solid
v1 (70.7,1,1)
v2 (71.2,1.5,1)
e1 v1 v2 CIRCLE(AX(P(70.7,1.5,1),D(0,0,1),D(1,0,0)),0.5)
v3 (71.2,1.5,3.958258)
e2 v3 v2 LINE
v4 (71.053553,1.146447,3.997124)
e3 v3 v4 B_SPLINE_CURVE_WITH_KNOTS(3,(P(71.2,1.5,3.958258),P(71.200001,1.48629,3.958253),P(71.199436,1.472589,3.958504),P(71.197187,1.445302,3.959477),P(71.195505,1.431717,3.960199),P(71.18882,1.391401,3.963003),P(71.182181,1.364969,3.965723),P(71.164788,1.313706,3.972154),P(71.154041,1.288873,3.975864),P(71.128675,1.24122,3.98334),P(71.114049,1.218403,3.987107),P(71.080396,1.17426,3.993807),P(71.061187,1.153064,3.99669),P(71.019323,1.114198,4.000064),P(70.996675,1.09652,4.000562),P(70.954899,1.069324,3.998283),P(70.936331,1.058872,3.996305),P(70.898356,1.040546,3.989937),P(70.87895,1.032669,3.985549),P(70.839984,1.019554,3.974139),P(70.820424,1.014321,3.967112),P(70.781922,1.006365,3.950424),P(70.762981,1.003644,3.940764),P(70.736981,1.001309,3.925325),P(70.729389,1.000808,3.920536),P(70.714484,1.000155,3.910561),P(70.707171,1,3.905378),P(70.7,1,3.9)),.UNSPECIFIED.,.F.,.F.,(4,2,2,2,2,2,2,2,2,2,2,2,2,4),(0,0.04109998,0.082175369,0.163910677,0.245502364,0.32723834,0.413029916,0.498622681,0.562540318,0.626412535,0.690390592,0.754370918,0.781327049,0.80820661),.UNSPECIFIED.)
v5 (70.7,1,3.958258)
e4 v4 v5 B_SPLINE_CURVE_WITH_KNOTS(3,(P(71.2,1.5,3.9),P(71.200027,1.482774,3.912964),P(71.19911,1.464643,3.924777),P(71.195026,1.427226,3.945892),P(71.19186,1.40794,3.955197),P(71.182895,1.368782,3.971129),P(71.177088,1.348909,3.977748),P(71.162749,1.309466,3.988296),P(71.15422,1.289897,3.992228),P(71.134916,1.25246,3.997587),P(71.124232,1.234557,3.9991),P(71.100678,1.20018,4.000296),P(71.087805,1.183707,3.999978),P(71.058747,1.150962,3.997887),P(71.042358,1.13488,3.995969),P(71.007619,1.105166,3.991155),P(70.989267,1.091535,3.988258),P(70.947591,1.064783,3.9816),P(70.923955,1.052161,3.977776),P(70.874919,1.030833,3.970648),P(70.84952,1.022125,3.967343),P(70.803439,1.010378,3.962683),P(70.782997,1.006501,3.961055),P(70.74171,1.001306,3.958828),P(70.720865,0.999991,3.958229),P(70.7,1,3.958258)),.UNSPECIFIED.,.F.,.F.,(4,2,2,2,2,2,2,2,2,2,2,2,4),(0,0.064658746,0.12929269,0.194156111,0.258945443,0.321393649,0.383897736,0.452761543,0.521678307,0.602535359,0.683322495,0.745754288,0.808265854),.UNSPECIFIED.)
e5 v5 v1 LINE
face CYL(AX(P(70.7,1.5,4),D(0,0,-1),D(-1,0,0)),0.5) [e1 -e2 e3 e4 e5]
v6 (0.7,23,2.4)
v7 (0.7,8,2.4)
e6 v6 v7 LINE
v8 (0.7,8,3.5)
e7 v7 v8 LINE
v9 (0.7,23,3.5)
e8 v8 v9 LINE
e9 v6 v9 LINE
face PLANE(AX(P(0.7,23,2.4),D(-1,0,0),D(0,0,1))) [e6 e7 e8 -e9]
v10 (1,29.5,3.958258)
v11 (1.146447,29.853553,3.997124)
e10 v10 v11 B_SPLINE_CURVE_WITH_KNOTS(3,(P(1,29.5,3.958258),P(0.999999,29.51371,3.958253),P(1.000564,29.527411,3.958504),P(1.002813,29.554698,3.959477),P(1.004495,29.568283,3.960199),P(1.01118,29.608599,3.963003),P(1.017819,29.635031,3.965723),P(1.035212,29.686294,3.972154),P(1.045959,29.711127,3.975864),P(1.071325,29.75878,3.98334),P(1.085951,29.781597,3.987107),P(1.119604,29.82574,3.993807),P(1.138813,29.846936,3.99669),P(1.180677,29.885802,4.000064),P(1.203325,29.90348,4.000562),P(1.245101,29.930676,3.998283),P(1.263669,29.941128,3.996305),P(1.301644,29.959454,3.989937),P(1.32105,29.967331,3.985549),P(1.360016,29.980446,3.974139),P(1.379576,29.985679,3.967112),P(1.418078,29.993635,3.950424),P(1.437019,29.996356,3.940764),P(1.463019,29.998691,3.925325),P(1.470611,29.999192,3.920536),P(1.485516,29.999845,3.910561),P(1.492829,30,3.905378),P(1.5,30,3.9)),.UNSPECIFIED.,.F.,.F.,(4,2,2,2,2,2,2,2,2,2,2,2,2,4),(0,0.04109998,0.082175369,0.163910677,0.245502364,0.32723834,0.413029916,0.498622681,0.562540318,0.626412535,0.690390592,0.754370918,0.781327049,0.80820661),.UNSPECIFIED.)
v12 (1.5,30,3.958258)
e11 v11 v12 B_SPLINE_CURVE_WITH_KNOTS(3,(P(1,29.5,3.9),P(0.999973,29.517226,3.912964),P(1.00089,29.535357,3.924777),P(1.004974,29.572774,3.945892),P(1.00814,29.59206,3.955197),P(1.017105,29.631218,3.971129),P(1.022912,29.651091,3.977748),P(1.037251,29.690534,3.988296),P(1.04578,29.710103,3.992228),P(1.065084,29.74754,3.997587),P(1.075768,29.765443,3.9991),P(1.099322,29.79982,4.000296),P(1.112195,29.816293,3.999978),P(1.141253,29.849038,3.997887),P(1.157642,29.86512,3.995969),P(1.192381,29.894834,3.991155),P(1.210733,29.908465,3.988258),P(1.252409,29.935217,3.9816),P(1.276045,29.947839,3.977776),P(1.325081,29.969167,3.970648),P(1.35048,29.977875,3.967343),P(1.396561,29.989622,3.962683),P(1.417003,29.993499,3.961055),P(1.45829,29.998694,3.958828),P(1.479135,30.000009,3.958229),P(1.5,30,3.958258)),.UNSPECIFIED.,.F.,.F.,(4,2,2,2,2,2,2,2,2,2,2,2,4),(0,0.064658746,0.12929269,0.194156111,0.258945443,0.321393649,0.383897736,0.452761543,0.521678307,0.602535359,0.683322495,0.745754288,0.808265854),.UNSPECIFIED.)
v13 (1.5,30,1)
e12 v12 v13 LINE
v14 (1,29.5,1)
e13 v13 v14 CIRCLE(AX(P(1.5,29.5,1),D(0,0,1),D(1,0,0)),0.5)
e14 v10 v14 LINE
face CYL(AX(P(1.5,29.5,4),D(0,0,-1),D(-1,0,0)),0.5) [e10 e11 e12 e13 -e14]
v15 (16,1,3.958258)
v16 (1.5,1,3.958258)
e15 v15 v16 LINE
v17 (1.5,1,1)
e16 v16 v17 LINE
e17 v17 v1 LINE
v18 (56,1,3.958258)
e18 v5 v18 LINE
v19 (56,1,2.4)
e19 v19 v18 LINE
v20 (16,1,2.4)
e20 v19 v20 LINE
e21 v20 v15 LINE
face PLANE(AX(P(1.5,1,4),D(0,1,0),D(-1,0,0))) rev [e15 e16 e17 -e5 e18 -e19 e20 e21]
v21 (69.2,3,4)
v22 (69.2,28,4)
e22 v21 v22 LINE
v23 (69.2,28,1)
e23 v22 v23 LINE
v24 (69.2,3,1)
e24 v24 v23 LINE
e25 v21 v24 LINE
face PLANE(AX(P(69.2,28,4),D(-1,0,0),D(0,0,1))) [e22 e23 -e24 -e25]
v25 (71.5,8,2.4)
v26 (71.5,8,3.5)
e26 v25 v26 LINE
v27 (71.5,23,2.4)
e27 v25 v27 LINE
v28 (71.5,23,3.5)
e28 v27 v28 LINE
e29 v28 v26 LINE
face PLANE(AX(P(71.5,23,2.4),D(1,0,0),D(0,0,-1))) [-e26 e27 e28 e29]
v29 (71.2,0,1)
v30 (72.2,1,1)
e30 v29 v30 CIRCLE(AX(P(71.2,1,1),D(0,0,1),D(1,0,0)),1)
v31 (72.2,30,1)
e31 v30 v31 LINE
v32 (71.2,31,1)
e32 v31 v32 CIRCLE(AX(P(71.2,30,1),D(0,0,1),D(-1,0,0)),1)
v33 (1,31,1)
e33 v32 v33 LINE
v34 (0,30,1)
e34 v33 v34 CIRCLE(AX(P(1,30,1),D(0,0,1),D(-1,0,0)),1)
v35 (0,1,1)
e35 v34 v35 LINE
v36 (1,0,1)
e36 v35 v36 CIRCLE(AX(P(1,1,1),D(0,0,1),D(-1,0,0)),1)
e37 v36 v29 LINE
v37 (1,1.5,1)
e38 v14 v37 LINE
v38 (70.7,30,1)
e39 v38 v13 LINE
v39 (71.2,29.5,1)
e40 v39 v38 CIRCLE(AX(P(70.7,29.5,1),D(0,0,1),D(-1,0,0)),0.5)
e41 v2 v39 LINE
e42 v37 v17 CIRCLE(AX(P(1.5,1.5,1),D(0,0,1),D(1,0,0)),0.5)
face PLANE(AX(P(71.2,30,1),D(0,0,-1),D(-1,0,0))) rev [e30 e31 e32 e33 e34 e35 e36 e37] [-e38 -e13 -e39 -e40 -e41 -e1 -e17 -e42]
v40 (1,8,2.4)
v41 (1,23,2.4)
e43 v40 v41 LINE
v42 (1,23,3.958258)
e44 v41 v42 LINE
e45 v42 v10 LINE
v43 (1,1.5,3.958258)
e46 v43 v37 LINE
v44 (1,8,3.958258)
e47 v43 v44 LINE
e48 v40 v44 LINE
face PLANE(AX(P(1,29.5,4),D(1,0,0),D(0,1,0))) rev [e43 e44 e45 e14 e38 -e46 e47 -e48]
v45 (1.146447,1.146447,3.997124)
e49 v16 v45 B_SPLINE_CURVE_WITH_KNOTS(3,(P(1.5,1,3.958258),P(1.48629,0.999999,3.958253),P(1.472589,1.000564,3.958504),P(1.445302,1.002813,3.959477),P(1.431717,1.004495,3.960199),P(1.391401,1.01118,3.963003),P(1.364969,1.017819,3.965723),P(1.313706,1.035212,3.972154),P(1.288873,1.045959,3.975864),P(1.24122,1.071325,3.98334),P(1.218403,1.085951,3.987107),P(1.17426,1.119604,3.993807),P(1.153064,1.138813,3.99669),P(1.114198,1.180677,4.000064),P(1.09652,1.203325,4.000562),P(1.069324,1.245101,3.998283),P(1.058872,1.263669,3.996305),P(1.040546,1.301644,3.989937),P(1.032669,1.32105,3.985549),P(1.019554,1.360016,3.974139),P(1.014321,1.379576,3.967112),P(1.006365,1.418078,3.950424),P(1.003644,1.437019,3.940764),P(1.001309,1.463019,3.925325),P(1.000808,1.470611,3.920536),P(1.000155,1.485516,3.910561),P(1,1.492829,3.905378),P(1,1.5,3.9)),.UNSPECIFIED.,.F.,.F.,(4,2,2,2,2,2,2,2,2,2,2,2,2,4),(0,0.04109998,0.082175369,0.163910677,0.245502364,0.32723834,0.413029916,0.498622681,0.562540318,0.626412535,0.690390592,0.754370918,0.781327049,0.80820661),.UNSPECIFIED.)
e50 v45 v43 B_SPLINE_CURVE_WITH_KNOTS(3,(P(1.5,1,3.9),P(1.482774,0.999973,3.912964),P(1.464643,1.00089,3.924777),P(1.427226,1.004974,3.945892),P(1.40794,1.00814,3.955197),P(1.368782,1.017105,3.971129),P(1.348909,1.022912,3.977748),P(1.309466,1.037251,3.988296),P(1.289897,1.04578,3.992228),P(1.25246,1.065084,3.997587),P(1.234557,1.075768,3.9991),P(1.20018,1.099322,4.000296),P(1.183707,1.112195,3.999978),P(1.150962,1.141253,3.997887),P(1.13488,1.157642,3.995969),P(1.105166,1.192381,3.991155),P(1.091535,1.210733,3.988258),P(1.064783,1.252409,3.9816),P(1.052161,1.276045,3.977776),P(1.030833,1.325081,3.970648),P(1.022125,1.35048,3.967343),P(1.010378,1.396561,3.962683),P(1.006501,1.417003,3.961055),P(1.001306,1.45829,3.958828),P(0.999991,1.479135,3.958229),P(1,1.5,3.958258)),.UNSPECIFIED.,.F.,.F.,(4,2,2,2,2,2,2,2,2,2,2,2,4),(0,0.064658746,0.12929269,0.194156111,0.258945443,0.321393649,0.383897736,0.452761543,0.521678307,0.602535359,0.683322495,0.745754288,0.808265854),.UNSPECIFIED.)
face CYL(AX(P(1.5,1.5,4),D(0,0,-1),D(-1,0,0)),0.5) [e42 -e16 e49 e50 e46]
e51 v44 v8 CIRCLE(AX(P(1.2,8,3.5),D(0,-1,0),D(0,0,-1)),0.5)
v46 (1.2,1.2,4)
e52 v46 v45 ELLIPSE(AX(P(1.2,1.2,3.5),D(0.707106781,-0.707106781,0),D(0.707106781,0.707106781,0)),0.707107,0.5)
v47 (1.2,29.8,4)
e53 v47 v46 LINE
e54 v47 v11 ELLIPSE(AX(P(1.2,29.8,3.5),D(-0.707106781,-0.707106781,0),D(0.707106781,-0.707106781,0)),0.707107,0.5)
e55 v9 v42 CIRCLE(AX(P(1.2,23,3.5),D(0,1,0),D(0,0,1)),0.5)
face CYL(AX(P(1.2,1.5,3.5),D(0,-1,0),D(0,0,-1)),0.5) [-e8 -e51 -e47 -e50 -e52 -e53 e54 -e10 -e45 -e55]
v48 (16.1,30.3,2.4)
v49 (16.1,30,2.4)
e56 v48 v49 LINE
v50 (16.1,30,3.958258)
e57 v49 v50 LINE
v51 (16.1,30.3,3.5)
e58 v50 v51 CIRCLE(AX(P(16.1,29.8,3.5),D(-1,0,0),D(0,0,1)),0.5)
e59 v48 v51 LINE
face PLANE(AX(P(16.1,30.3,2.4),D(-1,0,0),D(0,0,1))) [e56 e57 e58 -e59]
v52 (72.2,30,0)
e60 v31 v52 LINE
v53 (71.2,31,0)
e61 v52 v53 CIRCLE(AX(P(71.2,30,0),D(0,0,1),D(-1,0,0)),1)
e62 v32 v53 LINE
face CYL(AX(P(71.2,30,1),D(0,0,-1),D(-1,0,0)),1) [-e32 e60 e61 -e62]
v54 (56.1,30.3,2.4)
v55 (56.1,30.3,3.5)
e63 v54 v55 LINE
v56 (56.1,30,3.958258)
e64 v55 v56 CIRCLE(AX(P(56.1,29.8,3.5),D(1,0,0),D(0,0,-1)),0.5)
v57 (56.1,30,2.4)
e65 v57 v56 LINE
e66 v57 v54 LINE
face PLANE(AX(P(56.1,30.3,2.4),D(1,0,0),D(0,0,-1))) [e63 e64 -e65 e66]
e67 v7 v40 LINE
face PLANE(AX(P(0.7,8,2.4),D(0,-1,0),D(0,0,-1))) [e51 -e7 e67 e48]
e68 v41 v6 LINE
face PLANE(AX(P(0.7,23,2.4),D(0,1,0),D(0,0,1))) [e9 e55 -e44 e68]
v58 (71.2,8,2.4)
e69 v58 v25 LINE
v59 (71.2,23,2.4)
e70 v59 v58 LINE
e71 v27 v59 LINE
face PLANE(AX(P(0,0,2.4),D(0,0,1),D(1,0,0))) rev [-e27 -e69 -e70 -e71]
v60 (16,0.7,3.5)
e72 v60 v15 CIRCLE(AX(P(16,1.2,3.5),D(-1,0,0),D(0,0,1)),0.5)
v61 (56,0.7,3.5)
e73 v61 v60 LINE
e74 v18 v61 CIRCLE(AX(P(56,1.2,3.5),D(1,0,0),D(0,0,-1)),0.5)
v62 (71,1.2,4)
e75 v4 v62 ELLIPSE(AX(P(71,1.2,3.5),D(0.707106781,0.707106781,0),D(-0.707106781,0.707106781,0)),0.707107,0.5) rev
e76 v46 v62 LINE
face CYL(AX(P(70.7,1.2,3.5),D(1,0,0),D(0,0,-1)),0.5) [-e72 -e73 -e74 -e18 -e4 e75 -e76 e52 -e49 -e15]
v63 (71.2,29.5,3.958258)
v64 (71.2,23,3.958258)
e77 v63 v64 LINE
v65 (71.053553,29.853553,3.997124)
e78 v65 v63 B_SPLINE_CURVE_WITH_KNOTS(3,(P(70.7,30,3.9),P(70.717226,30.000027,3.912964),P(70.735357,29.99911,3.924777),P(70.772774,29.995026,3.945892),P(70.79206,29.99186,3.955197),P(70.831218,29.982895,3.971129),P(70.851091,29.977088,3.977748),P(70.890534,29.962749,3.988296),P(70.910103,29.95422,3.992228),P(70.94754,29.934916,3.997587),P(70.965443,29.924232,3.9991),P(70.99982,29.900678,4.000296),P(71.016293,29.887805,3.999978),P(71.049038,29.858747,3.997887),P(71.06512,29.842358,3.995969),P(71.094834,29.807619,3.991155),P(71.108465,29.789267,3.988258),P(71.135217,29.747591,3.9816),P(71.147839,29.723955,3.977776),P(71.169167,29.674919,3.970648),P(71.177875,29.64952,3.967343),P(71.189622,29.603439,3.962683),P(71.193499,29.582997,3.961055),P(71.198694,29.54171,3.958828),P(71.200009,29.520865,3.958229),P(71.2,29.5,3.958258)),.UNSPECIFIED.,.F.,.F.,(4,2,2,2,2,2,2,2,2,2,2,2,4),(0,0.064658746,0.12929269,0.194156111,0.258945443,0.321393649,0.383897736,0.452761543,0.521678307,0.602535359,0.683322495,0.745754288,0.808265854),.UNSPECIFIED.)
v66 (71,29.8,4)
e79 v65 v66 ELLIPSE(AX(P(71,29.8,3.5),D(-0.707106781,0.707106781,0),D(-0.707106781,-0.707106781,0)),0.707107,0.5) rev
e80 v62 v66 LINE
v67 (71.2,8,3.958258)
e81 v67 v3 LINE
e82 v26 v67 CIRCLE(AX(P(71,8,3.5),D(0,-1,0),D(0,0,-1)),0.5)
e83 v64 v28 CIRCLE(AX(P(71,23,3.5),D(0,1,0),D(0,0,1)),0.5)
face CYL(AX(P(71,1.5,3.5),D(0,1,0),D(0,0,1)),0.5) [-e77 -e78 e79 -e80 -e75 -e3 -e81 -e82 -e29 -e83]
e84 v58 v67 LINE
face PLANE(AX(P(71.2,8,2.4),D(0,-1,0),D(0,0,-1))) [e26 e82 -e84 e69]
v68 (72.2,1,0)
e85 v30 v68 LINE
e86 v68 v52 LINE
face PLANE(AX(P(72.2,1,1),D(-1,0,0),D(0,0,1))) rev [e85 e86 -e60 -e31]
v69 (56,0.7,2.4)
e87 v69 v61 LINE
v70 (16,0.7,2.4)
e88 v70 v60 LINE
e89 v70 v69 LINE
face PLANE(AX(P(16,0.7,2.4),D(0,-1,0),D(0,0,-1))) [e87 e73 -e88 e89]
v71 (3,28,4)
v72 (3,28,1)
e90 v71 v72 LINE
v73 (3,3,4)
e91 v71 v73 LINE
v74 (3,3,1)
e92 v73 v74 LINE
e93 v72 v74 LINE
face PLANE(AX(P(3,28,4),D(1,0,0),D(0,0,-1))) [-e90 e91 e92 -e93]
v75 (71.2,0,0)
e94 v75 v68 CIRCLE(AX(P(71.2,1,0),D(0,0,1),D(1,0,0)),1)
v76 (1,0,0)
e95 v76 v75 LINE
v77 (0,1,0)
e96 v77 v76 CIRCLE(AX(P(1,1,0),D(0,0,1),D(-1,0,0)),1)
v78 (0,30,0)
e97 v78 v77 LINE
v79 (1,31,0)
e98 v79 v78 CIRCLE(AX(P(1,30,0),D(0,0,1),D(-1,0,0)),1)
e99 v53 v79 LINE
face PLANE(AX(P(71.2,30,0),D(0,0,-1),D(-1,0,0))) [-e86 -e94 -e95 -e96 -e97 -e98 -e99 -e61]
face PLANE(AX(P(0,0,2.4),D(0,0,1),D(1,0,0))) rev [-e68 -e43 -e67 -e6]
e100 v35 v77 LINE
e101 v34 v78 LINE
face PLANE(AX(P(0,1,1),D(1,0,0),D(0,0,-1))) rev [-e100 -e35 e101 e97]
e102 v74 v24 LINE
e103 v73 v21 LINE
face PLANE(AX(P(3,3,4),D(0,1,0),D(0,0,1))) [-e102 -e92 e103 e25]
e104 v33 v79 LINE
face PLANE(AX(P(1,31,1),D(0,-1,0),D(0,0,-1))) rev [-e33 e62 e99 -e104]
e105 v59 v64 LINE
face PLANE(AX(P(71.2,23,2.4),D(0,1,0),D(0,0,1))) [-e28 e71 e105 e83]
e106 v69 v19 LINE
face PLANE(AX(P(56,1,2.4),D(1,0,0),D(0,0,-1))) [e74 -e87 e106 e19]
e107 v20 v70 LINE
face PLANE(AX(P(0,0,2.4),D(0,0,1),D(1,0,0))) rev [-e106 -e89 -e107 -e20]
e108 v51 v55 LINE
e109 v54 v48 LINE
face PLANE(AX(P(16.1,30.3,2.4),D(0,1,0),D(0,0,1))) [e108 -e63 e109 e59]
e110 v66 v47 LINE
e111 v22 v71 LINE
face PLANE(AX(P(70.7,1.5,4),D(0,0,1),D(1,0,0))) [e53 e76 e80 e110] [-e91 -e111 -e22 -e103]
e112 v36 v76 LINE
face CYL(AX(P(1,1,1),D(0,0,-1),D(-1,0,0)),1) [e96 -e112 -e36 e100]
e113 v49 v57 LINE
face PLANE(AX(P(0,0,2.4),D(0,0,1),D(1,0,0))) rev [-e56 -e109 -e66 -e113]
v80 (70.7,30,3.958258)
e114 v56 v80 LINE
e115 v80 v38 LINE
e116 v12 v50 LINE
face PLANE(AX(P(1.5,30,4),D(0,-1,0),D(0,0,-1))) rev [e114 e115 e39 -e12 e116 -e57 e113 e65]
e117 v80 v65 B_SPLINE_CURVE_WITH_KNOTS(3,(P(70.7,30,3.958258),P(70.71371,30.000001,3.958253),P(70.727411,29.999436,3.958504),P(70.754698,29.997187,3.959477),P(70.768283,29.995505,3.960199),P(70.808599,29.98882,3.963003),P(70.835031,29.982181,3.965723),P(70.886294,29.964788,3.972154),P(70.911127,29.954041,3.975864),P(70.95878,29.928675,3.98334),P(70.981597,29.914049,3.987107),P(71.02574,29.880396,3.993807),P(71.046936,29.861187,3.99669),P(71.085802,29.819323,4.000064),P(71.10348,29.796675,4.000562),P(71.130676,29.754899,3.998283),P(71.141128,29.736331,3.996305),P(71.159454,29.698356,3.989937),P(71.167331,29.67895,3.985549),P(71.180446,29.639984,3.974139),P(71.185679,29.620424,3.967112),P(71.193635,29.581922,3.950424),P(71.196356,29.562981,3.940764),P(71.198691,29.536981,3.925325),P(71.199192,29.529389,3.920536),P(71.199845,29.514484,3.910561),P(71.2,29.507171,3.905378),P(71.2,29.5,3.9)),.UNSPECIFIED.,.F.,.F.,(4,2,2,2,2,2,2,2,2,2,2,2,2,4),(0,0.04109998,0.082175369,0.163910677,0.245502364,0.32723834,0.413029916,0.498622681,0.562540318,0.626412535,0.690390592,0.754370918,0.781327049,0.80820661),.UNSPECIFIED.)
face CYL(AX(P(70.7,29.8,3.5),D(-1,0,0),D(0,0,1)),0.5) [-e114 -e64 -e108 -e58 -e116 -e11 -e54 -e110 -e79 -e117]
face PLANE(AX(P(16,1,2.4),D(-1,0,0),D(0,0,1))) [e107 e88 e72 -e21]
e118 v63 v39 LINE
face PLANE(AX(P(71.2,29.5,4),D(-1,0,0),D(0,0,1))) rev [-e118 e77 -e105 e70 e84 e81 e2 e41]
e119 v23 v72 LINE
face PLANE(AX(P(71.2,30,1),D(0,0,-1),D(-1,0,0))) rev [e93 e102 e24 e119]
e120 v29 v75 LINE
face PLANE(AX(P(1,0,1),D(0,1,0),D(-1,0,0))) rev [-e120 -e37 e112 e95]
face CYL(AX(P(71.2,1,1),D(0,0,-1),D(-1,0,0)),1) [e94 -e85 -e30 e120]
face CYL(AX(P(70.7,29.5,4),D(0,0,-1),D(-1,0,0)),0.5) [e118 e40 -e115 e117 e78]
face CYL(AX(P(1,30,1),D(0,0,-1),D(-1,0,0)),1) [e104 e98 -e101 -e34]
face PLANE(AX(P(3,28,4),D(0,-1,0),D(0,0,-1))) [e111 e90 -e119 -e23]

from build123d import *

# Parameters (mm, degrees)
BOSS_EXTRUDE1_DEPTH = 1
SKETCH2_W           = 66.2
SKETCH2_H           = 25
BOSS_EXTRUDE2_DEPTH = 3
SKETCH3_W           = 0.3
SKETCH3_H           = 15
SKETCH3_W_2         = 40
SKETCH3_H_2         = 0.3
BOSS_EXTRUDE3_DEPTH = 1.6
FILLET1_START       = 1
FILLET1_DEPTH       = 70.2
FILLET1_2_DEPTH     = 31


with BuildPart() as part:
    # Sketch1 → Boss-Extrude1 (new body)
    with BuildSketch(Plane.XY):
        with BuildLine():
            Line((1, 0), (71.2, 0))
            ThreePointArc((71.2, 0), (71.907106781, 0.292893219), (72.2, 1))
            Line((72.2, 1), (72.2, 30))
            ThreePointArc((72.2, 30), (71.907106781, 30.707106781), (71.2, 31))
            Line((71.2, 31), (1, 31))
            ThreePointArc((1, 31), (0.292893219, 30.707106781), (0, 30))
            Line((0, 30), (0, 1))
            ThreePointArc((0, 1), (0.292893219, 0.292893219), (1, 0))
        make_face()
    extrude(amount=BOSS_EXTRUDE1_DEPTH)

    # Sketch2 → Boss-Extrude2 (add)
    with BuildSketch(Plane.XY.offset(1)):
        with BuildLine():
            Line((1.5, 30), (70.7, 30))
            ThreePointArc((70.7, 30), (71.053553391, 29.853553391), (71.2, 29.5))
            Line((71.2, 29.5), (71.2, 1.5))
            ThreePointArc((71.2, 1.5), (71.053553391, 1.146446609), (70.7, 1))
            Line((70.7, 1), (1.5, 1))
            ThreePointArc((1.5, 1), (1.146446609, 1.146446609), (1, 1.5))
            Line((1, 1.5), (1, 29.5))
            ThreePointArc((1, 29.5), (1.146446609, 29.853553391), (1.5, 30))
        make_face()
        with Locations((36.1, 15.5)):
            Rectangle(SKETCH2_W, SKETCH2_H, mode=Mode.SUBTRACT)
    extrude(amount=BOSS_EXTRUDE2_DEPTH)

    # Sketch3 → Boss-Extrude3 (add)
    with BuildSketch(Plane.XY.offset(4)):
        with Locations((71.35, 15.5)):
            Rectangle(SKETCH3_W, SKETCH3_H)
        with Locations((36.1, 30.15)):
            Rectangle(SKETCH3_W_2, SKETCH3_H_2)
        with Locations((0.85, 15.5)):
            Rectangle(SKETCH3_W, SKETCH3_H)
        with Locations((36, 0.85)):
            Rectangle(SKETCH3_W_2, SKETCH3_H_2)
    extrude(amount=-BOSS_EXTRUDE3_DEPTH)

    # Fillet1: read off the stored shape, not the designer's step
    # Fillet1 outline → Fillet1 (cut)
    with BuildSketch(Plane.YZ.offset(FILLET1_START)):
        with BuildLine():
            ThreePointArc((29.8, 4), (30.153553391, 3.853553391), (30.3, 3.5))
            Line((30.3, 3.5), (30.3, 4))
            Line((30.3, 4), (29.8, 4))
        make_face()
        with BuildLine():
            Line((1.2, 4), (0.7, 4))
            Line((0.7, 4), (0.7, 3.5))
            ThreePointArc((0.7, 3.5), (0.846446609, 3.853553391), (1.2, 4))
        make_face()
    extrude(amount=FILLET1_DEPTH, mode=Mode.SUBTRACT)

    # Fillet1 2 outline → Fillet1 2 (cut)
    with BuildSketch(Plane(origin=(0, 0, 0), x_dir=(1, 0, 0), z_dir=(0, 1, 0))):
        with BuildLine():
            ThreePointArc((1.2, -4), (0.846446609, -3.853553391), (0.7, -3.5))
            Line((0.7, -3.5), (0.7, -4))
            Line((0.7, -4), (1.2, -4))
        make_face()
        with BuildLine():
            Line((71, -4), (71.5, -4))
            Line((71.5, -4), (71.5, -3.5))
            ThreePointArc((71.5, -3.5), (71.353553391, -3.853553391), (71, -4))
        make_face()
    extrude(amount=FILLET1_2_DEPTH, mode=Mode.SUBTRACT)


solid = part.part
